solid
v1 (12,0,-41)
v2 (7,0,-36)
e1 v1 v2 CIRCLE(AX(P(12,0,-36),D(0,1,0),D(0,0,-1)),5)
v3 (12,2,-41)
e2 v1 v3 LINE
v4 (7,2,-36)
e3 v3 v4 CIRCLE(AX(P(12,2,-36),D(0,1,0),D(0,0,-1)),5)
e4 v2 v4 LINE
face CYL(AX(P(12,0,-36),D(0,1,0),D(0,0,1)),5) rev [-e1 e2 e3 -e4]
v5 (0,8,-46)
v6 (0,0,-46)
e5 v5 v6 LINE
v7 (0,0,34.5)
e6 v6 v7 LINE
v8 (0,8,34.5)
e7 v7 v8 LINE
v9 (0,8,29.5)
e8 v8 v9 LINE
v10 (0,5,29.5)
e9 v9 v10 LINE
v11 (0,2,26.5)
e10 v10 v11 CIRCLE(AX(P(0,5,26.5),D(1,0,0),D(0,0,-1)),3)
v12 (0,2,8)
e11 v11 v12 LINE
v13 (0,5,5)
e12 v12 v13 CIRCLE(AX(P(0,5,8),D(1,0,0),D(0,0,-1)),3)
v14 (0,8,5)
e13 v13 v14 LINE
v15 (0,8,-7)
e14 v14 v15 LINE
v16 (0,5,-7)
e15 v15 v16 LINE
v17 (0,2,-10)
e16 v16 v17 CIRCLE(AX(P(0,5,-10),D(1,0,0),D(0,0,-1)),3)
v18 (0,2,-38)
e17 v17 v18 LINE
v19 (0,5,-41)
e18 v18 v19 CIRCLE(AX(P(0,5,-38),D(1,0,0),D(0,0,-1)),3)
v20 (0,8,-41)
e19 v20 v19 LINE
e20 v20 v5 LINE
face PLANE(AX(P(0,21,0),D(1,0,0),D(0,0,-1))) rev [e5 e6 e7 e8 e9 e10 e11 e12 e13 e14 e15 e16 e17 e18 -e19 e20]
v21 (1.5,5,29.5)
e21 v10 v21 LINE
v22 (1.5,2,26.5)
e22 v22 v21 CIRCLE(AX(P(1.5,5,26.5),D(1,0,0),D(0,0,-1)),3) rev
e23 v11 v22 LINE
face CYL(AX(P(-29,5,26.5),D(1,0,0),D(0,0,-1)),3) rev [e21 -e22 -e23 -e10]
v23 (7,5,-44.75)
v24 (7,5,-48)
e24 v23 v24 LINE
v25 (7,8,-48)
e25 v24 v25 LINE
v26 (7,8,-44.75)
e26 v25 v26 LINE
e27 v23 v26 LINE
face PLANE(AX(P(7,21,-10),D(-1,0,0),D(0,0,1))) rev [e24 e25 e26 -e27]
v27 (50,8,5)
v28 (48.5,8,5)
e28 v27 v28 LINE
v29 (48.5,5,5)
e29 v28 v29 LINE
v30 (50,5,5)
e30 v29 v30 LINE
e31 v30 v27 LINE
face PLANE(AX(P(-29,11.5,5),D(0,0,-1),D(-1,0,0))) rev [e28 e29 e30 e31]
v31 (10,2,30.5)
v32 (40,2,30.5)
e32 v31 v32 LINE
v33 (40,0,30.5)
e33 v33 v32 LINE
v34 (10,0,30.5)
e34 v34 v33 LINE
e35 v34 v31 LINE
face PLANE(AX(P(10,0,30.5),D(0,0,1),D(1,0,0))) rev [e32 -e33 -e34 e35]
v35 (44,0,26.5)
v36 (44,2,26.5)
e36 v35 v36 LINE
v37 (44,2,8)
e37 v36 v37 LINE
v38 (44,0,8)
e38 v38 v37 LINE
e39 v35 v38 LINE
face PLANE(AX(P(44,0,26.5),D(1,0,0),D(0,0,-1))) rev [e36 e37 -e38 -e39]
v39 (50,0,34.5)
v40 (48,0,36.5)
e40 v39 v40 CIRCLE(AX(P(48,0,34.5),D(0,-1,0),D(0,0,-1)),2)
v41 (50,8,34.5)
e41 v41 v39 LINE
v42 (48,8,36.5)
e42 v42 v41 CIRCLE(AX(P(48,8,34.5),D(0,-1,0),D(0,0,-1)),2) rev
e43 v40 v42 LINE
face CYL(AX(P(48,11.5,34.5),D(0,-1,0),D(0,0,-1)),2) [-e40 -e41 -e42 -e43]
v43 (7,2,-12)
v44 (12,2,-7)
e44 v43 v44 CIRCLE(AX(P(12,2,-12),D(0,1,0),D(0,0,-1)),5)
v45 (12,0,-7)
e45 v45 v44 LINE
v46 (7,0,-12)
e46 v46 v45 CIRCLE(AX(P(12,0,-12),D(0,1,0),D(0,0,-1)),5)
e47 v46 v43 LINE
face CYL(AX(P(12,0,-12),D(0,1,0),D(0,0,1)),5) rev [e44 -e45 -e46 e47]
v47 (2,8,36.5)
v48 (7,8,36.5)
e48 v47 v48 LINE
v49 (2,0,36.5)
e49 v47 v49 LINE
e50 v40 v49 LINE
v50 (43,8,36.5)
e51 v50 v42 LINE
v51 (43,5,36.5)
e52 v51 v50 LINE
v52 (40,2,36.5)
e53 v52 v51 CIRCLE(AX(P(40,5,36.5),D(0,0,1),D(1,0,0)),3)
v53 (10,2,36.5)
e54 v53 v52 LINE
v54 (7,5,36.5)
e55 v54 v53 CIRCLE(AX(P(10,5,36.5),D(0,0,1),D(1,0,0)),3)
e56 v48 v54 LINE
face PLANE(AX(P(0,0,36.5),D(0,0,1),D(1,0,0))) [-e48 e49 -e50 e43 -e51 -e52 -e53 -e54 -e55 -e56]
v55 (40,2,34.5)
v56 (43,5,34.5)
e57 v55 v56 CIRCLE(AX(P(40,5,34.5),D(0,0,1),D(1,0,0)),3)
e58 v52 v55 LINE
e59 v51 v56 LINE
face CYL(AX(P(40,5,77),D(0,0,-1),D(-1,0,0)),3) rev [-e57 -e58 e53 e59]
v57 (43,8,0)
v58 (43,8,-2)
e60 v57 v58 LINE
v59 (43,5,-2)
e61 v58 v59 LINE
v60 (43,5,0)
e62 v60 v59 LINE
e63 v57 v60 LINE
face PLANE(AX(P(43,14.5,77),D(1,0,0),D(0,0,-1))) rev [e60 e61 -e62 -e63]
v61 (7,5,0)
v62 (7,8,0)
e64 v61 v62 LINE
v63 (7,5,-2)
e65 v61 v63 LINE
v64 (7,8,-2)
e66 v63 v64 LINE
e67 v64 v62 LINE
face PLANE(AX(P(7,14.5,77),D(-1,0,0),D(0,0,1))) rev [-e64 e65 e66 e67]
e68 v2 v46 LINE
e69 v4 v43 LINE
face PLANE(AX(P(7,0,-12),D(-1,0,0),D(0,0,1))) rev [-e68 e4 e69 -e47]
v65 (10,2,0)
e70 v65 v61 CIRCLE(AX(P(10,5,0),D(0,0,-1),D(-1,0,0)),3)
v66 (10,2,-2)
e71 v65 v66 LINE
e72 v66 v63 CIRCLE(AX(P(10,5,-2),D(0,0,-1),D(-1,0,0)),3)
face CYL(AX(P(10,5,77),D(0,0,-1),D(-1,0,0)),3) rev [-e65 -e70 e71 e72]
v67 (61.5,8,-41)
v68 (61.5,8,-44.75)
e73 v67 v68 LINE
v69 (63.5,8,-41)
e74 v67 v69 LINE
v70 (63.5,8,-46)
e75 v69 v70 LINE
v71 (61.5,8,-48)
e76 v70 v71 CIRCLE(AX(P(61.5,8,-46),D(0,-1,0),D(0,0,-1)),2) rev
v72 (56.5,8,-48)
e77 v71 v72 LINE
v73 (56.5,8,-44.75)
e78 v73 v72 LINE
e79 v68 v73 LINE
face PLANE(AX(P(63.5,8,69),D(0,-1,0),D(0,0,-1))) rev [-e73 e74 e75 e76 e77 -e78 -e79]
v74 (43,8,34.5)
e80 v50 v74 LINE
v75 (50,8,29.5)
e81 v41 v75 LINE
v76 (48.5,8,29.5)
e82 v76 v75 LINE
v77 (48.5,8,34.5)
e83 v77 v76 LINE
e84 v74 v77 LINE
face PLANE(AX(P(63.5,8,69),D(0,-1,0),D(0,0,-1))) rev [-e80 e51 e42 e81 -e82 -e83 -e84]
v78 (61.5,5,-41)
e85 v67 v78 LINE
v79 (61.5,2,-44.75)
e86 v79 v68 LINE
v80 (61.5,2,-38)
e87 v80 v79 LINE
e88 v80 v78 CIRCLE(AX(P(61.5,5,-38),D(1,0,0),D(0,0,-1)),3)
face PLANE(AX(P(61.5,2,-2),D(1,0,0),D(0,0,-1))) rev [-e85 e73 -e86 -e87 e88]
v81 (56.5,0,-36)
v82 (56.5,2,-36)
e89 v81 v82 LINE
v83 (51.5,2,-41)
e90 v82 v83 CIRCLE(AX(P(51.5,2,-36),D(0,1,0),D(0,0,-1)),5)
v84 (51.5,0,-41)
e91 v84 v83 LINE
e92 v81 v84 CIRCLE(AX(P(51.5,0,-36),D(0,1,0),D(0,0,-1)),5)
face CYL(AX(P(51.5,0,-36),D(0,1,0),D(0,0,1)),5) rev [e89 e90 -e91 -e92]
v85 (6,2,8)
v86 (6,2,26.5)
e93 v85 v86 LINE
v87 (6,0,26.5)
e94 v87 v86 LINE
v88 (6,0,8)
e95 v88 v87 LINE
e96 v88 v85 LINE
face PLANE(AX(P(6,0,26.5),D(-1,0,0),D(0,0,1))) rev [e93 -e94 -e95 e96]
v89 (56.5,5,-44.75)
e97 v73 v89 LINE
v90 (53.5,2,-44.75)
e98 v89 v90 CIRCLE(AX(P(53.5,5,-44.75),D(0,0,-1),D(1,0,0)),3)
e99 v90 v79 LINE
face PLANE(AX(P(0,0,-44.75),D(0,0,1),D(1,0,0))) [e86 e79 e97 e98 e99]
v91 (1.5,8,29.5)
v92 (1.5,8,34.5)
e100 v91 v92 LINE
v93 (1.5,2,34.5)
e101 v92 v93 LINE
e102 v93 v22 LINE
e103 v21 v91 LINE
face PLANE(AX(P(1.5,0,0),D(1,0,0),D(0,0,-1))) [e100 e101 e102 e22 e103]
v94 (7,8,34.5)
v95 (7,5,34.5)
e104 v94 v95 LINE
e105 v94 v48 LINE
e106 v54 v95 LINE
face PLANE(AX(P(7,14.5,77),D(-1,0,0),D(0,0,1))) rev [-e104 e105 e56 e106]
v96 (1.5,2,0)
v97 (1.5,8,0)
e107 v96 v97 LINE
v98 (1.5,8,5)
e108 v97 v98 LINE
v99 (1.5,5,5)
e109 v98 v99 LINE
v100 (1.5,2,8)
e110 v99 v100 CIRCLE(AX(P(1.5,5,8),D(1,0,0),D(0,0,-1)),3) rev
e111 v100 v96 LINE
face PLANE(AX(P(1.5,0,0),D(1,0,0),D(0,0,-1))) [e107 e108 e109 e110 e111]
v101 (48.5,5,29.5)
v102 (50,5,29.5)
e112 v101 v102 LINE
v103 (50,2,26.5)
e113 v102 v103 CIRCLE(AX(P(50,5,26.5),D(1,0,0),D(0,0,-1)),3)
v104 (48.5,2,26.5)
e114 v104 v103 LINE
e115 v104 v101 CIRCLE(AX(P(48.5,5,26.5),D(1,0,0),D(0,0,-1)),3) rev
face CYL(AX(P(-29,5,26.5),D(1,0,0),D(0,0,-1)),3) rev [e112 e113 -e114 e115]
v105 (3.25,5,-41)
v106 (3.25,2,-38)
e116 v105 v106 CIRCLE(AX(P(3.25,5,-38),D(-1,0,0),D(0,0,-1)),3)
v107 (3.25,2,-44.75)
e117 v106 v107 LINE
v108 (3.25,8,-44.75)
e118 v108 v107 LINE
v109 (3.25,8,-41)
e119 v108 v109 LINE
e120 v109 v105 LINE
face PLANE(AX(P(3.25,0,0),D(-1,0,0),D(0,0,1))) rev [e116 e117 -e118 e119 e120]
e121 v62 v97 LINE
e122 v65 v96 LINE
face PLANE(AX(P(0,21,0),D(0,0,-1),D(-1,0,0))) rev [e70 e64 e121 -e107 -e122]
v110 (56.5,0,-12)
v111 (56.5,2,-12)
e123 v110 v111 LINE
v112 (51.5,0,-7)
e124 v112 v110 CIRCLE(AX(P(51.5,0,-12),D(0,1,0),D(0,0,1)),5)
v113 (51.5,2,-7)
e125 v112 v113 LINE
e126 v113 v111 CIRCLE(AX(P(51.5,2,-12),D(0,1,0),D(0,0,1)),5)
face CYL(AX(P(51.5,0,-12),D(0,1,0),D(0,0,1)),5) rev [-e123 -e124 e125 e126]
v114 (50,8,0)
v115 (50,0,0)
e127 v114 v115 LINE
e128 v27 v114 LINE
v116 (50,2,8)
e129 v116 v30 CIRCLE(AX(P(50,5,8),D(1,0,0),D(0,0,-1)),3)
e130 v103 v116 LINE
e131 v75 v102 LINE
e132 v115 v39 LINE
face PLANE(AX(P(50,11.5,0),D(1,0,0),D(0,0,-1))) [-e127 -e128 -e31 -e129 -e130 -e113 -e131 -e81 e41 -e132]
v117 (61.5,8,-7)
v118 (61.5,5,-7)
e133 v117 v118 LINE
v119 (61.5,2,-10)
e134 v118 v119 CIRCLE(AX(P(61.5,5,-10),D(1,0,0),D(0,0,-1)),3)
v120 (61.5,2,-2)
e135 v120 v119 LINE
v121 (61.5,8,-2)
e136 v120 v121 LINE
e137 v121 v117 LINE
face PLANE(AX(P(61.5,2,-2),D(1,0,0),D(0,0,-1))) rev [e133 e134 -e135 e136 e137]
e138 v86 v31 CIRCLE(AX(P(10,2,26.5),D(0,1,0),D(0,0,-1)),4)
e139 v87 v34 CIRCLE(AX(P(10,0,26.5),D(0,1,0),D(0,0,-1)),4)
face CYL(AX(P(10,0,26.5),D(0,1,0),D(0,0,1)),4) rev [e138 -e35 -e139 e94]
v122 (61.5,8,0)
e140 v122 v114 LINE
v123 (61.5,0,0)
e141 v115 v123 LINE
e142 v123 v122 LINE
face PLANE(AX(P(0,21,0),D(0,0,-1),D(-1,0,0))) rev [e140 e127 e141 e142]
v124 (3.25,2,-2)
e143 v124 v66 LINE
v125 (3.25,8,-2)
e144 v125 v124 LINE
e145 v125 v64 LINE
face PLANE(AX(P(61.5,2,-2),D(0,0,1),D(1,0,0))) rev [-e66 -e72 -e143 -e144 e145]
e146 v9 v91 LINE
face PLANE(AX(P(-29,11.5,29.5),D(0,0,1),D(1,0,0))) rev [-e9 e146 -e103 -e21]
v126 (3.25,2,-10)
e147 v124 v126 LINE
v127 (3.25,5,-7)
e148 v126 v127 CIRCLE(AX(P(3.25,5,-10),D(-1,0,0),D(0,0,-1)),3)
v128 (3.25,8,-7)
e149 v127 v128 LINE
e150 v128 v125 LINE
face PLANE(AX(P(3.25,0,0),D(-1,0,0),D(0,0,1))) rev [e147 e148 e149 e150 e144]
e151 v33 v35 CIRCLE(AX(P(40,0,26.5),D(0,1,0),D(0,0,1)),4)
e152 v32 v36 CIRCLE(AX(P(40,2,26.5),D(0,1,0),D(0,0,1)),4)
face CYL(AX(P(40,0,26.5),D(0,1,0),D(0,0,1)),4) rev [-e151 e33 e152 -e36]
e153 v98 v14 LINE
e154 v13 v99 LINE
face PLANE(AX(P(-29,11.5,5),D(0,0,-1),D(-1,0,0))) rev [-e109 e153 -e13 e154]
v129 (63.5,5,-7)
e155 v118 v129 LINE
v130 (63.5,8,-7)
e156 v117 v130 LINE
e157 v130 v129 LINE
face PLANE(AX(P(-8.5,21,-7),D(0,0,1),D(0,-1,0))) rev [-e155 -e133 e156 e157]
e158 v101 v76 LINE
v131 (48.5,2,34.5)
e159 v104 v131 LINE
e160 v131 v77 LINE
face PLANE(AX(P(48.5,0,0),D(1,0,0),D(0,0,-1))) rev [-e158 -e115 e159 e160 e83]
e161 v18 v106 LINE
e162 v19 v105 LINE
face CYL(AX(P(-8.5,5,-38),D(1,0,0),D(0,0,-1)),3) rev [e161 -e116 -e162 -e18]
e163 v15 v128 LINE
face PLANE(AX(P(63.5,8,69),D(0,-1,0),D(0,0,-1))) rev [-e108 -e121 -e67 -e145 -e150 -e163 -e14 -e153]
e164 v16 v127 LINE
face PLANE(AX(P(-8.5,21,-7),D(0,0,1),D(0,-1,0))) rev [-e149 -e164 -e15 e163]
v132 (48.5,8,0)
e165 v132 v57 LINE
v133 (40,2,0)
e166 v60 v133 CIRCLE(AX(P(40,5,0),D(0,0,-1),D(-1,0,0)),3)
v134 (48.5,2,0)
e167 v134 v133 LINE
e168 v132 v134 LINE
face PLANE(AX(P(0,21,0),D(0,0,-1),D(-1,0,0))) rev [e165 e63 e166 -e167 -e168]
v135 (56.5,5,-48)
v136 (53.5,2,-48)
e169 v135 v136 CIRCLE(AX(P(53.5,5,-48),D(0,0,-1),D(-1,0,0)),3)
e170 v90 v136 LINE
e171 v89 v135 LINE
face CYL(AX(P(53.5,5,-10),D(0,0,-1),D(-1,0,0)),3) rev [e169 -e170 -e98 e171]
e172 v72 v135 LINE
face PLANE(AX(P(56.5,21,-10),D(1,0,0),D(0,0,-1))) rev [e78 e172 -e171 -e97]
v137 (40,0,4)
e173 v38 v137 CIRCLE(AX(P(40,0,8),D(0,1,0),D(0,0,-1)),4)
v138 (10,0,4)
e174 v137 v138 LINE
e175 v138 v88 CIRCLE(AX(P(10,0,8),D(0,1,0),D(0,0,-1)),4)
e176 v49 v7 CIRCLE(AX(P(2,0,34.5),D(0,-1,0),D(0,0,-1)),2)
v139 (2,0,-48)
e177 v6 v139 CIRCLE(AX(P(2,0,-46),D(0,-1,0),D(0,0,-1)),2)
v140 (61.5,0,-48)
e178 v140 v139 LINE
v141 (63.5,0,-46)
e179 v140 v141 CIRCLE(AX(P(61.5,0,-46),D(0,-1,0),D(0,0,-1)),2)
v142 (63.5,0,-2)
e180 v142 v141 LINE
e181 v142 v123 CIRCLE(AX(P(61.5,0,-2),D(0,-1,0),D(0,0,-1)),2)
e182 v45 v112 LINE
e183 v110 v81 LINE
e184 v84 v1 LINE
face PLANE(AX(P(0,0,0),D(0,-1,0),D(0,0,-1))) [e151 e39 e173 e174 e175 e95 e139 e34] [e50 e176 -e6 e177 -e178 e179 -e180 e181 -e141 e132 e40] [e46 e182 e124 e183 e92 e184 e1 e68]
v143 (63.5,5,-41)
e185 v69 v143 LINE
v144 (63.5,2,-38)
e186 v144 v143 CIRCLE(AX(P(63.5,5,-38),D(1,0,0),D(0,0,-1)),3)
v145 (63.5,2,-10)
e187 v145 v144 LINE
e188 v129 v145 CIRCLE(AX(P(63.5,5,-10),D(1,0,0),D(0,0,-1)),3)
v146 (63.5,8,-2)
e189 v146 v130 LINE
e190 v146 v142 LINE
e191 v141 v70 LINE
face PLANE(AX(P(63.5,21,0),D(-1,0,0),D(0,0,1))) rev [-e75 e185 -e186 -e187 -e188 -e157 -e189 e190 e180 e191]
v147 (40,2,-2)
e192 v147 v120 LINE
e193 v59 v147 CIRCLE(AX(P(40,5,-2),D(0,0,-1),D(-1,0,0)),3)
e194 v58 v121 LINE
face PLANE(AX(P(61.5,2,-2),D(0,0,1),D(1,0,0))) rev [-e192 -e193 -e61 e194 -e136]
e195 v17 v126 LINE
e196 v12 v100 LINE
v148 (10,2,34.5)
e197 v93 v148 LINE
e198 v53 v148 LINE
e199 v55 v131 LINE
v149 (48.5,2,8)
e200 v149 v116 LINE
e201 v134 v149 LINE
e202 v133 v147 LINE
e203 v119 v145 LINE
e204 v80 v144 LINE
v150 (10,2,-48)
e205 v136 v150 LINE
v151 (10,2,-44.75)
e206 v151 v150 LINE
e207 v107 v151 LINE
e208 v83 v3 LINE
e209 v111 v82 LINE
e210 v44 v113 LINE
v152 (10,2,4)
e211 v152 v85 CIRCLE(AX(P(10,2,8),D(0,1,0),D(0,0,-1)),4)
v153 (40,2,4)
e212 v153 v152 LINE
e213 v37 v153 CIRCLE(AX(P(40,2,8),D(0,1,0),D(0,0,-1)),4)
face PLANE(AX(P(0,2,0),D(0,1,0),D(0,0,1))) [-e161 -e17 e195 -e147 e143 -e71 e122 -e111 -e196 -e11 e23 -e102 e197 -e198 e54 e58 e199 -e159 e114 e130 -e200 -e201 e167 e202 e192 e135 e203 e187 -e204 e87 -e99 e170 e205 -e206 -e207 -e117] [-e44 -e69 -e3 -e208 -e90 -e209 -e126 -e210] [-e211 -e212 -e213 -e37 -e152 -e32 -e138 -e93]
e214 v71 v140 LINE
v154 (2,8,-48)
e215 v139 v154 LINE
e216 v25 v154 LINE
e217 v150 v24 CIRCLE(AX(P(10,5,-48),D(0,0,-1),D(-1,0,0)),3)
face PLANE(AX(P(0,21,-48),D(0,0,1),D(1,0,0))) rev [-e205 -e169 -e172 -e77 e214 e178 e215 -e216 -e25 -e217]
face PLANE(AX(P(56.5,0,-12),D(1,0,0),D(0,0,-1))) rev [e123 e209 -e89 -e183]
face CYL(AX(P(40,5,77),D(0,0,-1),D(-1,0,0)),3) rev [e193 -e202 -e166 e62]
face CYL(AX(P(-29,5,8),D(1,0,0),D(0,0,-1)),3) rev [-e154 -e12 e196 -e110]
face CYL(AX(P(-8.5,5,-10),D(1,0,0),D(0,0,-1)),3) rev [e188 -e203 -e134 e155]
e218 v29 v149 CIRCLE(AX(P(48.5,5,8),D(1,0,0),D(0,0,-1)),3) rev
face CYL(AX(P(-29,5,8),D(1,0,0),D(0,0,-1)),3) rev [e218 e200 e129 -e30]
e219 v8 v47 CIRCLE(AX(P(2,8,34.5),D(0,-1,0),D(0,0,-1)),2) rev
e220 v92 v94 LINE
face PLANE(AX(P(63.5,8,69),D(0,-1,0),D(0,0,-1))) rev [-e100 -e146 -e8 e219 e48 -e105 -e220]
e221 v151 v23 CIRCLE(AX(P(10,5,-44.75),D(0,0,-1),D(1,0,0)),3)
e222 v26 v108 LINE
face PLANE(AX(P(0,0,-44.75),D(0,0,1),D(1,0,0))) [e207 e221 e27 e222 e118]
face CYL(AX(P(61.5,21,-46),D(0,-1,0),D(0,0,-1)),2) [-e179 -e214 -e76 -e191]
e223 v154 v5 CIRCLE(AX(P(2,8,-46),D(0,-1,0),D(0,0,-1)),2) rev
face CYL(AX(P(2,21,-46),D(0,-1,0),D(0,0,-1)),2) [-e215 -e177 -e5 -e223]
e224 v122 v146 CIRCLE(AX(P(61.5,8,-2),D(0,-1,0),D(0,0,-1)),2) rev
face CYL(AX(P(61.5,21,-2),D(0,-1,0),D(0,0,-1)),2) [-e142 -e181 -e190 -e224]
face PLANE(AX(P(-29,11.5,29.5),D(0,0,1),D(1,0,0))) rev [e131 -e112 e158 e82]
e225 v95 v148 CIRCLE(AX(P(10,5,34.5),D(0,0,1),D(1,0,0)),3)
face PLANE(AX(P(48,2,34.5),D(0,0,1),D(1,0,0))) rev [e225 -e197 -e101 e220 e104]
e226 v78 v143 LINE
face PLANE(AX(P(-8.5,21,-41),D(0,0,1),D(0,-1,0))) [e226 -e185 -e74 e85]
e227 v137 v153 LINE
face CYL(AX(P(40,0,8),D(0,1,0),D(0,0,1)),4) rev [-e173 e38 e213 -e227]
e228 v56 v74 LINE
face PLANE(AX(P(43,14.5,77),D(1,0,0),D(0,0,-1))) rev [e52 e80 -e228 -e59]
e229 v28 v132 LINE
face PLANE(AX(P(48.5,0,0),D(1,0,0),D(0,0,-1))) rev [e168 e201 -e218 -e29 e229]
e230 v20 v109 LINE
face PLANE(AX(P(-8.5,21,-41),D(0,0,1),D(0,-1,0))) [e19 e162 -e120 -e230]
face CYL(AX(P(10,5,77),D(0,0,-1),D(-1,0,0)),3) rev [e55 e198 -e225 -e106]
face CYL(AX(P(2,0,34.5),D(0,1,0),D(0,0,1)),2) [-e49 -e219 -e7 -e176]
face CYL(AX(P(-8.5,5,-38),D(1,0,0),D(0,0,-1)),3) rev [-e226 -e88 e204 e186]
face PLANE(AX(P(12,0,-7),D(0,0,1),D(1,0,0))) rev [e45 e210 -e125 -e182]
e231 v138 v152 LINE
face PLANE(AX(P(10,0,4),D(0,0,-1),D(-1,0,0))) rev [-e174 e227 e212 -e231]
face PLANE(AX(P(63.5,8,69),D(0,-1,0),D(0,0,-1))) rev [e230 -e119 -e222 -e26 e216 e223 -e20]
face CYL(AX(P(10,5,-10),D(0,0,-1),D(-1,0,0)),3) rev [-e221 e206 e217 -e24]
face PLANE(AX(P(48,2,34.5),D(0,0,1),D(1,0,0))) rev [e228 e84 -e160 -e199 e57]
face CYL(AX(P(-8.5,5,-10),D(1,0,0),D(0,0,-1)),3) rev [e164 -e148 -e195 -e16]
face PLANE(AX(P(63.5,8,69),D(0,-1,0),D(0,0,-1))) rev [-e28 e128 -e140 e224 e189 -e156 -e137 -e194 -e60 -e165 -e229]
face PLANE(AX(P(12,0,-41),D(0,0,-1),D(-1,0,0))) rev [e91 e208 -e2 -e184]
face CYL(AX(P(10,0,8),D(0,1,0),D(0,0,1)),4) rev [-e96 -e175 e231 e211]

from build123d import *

# Parameters (mm, degrees)
SKETCH1_W            = 63.5
SKETCH1_H            = 48
BOSS_EXTRUDE6_DEPTH  = 21
SKETCH5_W            = 50
SKETCH5_H            = 38.5
BOSS_EXTRUDE7_DEPTH  = 11.5
SKETCH6_W            = 59.5
SKETCH6_H            = 44
CUT_EXTRUDE1_DEPTH   = 19
SKETCH7_W            = 46
SKETCH7_H            = 34.5
CUT_EXTRUDE2_DEPTH   = 9.5
SKETCH8_W            = 50
SKETCH8_H            = 11.5
CUT_EXTRUDE4_DEPTH   = 2
CUT_EXTRUDE6_DEPTH   = 2
CUT_EXTRUDE7_DEPTH   = 2
CUT_EXTRUDE10_DEPTH  = 72
CUT_EXTRUDE11_DEPTH  = 38
SKETCH16_W           = 67
SKETCH16_H           = 6.5
CUT_EXTRUDE13_DEPTH  = 79
CUT_EXTRUDE14_DEPTH  = 79
CUT_EXTRUDE15_DEPTH  = 79
FILLET1_R            = 2
FILLET2_R            = 2
FILLET3_R            = 2
FILLET4_R            = 2
FILLET5_R            = 2
SKETCH19_W           = 36.5
SKETCH19_H           = 2
CUT_EXTRUDE17_DEPTH  = 79
FILLET6_R            = 5
FILLET7_R            = 5
SKETCH20_W           = 4
SKETCH20_H           = 2
BOSS_EXTRUDE16_DEPTH = 18
SKETCH30_W           = 4
SKETCH30_H           = 1
BOSS_EXTRUDE17_DEPTH = 2
SKETCH33_W           = 4
SKETCH33_H           = 1.5
BOSS_EXTRUDE18_DEPTH = 4
SKETCH34_W           = 4
SKETCH34_H           = 1
BOSS_EXTRUDE19_DEPTH = 2
SKETCH36_W           = 4
SKETCH36_H           = 1
CUT_EXTRUDE21_DEPTH  = 2
CUT_EXTRUDE22_DEPTH  = 7
CUT_EXTRUDE25_DEPTH  = 7
SKETCH39_W           = 9.212342007
SKETCH39_H           = 18
CUT_EXTRUDE26_DEPTH  = 10
SKETCH40_W           = 63.5
SKETCH40_H           = 6.5
CUT_EXTRUDE27_DEPTH  = 117
SKETCH44_W           = 34.5
SKETCH44_H           = 6
CUT_EXTRUDE30_DEPTH  = 0.5
SKETCH45_W           = 34.5
SKETCH45_H           = 6
CUT_EXTRUDE31_DEPTH  = 0.5
SKETCH46_W           = 44
SKETCH46_H           = 6
BOSS_EXTRUDE20_DEPTH = 1.25
SKETCH47_W           = 58.25
SKETCH47_H           = 6
BOSS_EXTRUDE21_DEPTH = 1.25
CUT_EXTRUDE32_START  = -1.25
CUT_EXTRUDE32_DEPTH  = 1.25
CUT_EXTRUDE33_DEPTH  = 1.25


with BuildPart() as part:
    # Sketch1 → Boss-Extrude6 (new body)
    with BuildSketch(Plane(origin=(0, 0, 0), x_dir=(1, 0, 0), z_dir=(0, 1, 0))):
        with Locations((31.75, 24)):
            Rectangle(SKETCH1_W, SKETCH1_H)
    extrude(amount=BOSS_EXTRUDE6_DEPTH)

    # Sketch5 → Boss-Extrude7 (add)
    with BuildSketch(Plane(origin=(0, 0, 0), x_dir=(-1, 0, 0), z_dir=(0, -1, 0))):
        with Locations((-25, -19.25)):
            Rectangle(SKETCH5_W, SKETCH5_H)
    extrude(amount=-BOSS_EXTRUDE7_DEPTH)

    # Sketch6 → Cut-Extrude1 (cut)
    with BuildSketch(Plane(origin=(0, 21, 0), x_dir=(1, 0, 0), z_dir=(0, 1, 0))):
        with Locations((31.75, 24)):
            Rectangle(SKETCH6_W, SKETCH6_H)
    extrude(amount=-CUT_EXTRUDE1_DEPTH, mode=Mode.SUBTRACT)

    # Sketch7 → Cut-Extrude2 (cut)
    with BuildSketch(Plane(origin=(0, 11.5, 0), x_dir=(1, 0, 0), z_dir=(0, 1, 0))):
        with Locations((25, -17.25)):
            Rectangle(SKETCH7_W, SKETCH7_H)
    extrude(amount=-CUT_EXTRUDE2_DEPTH, mode=Mode.SUBTRACT)

    # Sketch8 → Cut-Extrude4 (cut)
    with BuildSketch(Plane.XY.offset(38.5)):
        with Locations((25, 5.75)):
            Rectangle(SKETCH8_W, SKETCH8_H)
    extrude(amount=-CUT_EXTRUDE4_DEPTH, mode=Mode.SUBTRACT)

    # Sketch10 → Cut-Extrude6 (cut)
    with BuildSketch(Plane(origin=(0, 2, 0), x_dir=(1, 0, 0), z_dir=(0, 1, 0))):
        with BuildLine():
            Line((12, 7), (51.5, 7))
            ThreePointArc((51.5, 7), (55.035533906, 8.464466094), (56.5, 12))
            Line((56.5, 12), (56.5, 36))
            ThreePointArc((56.5, 36), (55.035533906, 39.535533906), (51.5, 41))
            Line((51.5, 41), (12, 41))
            ThreePointArc((12, 41), (8.464466094, 39.535533906), (7, 36))
            Line((7, 36), (7, 12))
            ThreePointArc((7, 12), (8.464466094, 8.464466094), (12, 7))
        make_face()
    extrude(amount=-CUT_EXTRUDE6_DEPTH, mode=Mode.SUBTRACT)

    # Sketch11 → Cut-Extrude7 (cut)
    with BuildSketch(Plane(origin=(0, 2, 0), x_dir=(1, 0, 0), z_dir=(0, 1, 0))):
        with BuildLine():
            Line((10, -30.5), (40, -30.5))
            ThreePointArc((40, -30.5), (42.828427125, -29.328427125), (44, -26.5))
            Line((44, -26.5), (44, -8))
            ThreePointArc((44, -8), (42.828427125, -5.171572875), (40, -4))
            Line((40, -4), (10, -4))
            ThreePointArc((10, -4), (7.171572875, -5.171572875), (6, -8))
            Line((6, -8), (6, -26.5))
            ThreePointArc((6, -26.5), (7.171572875, -29.328427125), (10, -30.5))
        make_face()
    extrude(amount=-CUT_EXTRUDE7_DEPTH, mode=Mode.SUBTRACT)

    # Sketch13 → Cut-Extrude10 (cut)
    with BuildSketch(Plane(origin=(63.5, 0, 0), x_dir=(0, 0, -1), z_dir=(1, 0, 0))):
        with BuildLine():
            Line((7, 21), (41, 21))
            Line((41, 21), (41, 5))
            ThreePointArc((41, 5), (40.121320344, 2.878679656), (38, 2))
            Line((38, 2), (10, 2))
            ThreePointArc((10, 2), (7.878679656, 2.878679656), (7, 5))
            Line((7, 5), (7, 21))
        make_face()
    extrude(amount=-CUT_EXTRUDE10_DEPTH, mode=Mode.SUBTRACT)

    # Sketch14 → Cut-Extrude11 (cut)
    with BuildSketch(Plane(origin=(0, 0, -48), x_dir=(-1, 0, 0), z_dir=(0, 0, -1))):
        with BuildLine():
            Line((-56.5, 21), (-7, 21))
            Line((-7, 21), (-7, 5))
            ThreePointArc((-7, 5), (-7.878679656, 2.878679656), (-10, 2))
            Line((-10, 2), (-53.5, 2))
            ThreePointArc((-53.5, 2), (-55.621320344, 2.878679656), (-56.5, 5))
            Line((-56.5, 5), (-56.5, 21))
        make_face()
    extrude(amount=-CUT_EXTRUDE11_DEPTH, mode=Mode.SUBTRACT)

    # Sketch16 → Cut-Extrude13 (cut)
    with BuildSketch(Plane(origin=(63.5, 0, 0), x_dir=(0, 0, -1), z_dir=(1, 0, 0))):
        with Locations((14.5, 17.75)):
            Rectangle(SKETCH16_W, SKETCH16_H)
    extrude(amount=-CUT_EXTRUDE13_DEPTH, mode=Mode.SUBTRACT)

    # Sketch17 → Cut-Extrude14 (cut)
    with BuildSketch(Plane(origin=(0, 0, -2), x_dir=(-1, 0, 0), z_dir=(0, 0, -1))):
        with BuildLine():
            Line((-43, 14.5), (-7, 14.5))
            Line((-7, 14.5), (-7, 5))
            ThreePointArc((-7, 5), (-7.878679656, 2.878679656), (-10, 2))
            Line((-10, 2), (-40, 2))
            ThreePointArc((-40, 2), (-42.121320344, 2.878679656), (-43, 5))
            Line((-43, 5), (-43, 14.5))
        make_face()
    extrude(amount=-CUT_EXTRUDE14_DEPTH, mode=Mode.SUBTRACT)

    # Sketch18 → Cut-Extrude15 (cut)
    with BuildSketch(Plane(origin=(50, 0, 0), x_dir=(0, 0, -1), z_dir=(1, 0, 0))):
        with BuildLine():
            Line((-29.5, 11.5), (-5, 11.5))
            Line((-5, 11.5), (-5, 5))
            ThreePointArc((-5, 5), (-5.878679656, 2.878679656), (-8, 2))
            Line((-8, 2), (-26.5, 2))
            ThreePointArc((-26.5, 2), (-28.621320344, 2.878679656), (-29.5, 5))
            Line((-29.5, 5), (-29.5, 11.5))
        make_face()
    extrude(amount=-CUT_EXTRUDE15_DEPTH, mode=Mode.SUBTRACT)

    # Fillet1
    fillet1_edges = [part.edges().sort_by_distance(p)[0] for p in [
        (50, 5.75, 36.5),
    ]]
    fillet(fillet1_edges, radius=FILLET1_R)

    # Fillet2
    fillet2_edges = [part.edges().sort_by_distance(p)[0] for p in [
        (0, 5.75, 36.5),
    ]]
    fillet(fillet2_edges, radius=FILLET2_R)

    # Fillet3
    fillet3_edges = [part.edges().sort_by_distance(p)[0] for p in [
        (0, 7.25, -48),
    ]]
    fillet(fillet3_edges, radius=FILLET3_R)

    # Fillet4
    fillet4_edges = [part.edges().sort_by_distance(p)[0] for p in [
        (63.5, 7.25, -48),
    ]]
    fillet(fillet4_edges, radius=FILLET4_R)

    # Fillet5
    fillet5_edges = [part.edges().sort_by_distance(p)[0] for p in [
        (63.5, 7.25, 0),
    ]]
    fillet(fillet5_edges, radius=FILLET5_R)

    # Sketch19 → Cut-Extrude17 (cut)
    with BuildSketch(Plane(origin=(50, 0, 0), x_dir=(0, 0, -1), z_dir=(1, 0, 0))):
        with Locations((-18.25, 10.5)):
            Rectangle(SKETCH19_W, SKETCH19_H)
    extrude(amount=-CUT_EXTRUDE17_DEPTH, mode=Mode.SUBTRACT)

    # Fillet6
    fillet6_edges = [part.edges().sort_by_distance(p)[0] for p in [
        (1, 9.5, 0),
    ]]
    fillet(fillet6_edges, radius=FILLET6_R - 0.0001)  # a hair under: the kernel refuses the full size

    # Fillet7
    fillet7_edges = [part.edges().sort_by_distance(p)[0] for p in [
        (49, 9.5, 0),
    ]]
    fillet(fillet7_edges, radius=FILLET7_R - 0.0001)  # a hair under: the kernel refuses the full size

    # Sketch20 → Boss-Extrude16 (add)
    with BuildSketch(Plane(origin=(0, 2, 0), x_dir=(1, 0, 0), z_dir=(0, 1, 0))):
        with Locations((25, 1)):
            Rectangle(SKETCH20_W, SKETCH20_H)
    extrude(amount=BOSS_EXTRUDE16_DEPTH)

    # Sketch30 → Boss-Extrude17 (add)
    with BuildSketch(Plane.XY):
        with Locations((25, 19.5)):
            Rectangle(SKETCH30_W, SKETCH30_H)
    extrude(amount=BOSS_EXTRUDE17_DEPTH)

    # Sketch33 → Boss-Extrude18 (add)
    with BuildSketch(Plane.XY):
        with Locations((25, 12.75)):
            Rectangle(SKETCH33_W, SKETCH33_H)
    extrude(amount=BOSS_EXTRUDE18_DEPTH)

    # Sketch34 → Boss-Extrude19 (add)
    with BuildSketch(Plane(origin=(0, 0, -2), x_dir=(-1, 0, 0), z_dir=(0, 0, -1))):
        with Locations((-25, 19.5)):
            Rectangle(SKETCH34_W, SKETCH34_H)
    extrude(amount=BOSS_EXTRUDE19_DEPTH)

    # Sketch36 → Cut-Extrude21 (cut)
    with BuildSketch(Plane.XY.offset(2)):
        with Locations((25, 19.5)):
            Rectangle(SKETCH36_W, SKETCH36_H)
    extrude(amount=-CUT_EXTRUDE21_DEPTH, mode=Mode.SUBTRACT)

    # Sketch37 → Cut-Extrude22 (cut)
    with BuildSketch(Plane(origin=(27, 0, 0), x_dir=(0, 0, -1), z_dir=(1, 0, 0))):
        Polygon((0, 20), (4, 19.257089557), (4, 20), align=None)
    extrude(amount=-CUT_EXTRUDE22_DEPTH, mode=Mode.SUBTRACT)

    # Sketch38 → Cut-Extrude25 (cut)
    with BuildSketch(Plane(origin=(27, 0, 0), x_dir=(0, 0, -1), z_dir=(1, 0, 0))):
        Polygon((0, 13.5), (-4, 10.225610037), (-4, 13.5), align=None)
    extrude(amount=-CUT_EXTRUDE25_DEPTH, mode=Mode.SUBTRACT)

    # Sketch39 → Cut-Extrude26 (cut)
    with BuildSketch(Plane(origin=(27, 0, 0), x_dir=(0, 0, -1), z_dir=(1, 0, 0))):
        with Locations((2.773768612, 11)):
            Rectangle(SKETCH39_W, SKETCH39_H)
    extrude(amount=-CUT_EXTRUDE26_DEPTH, mode=Mode.SUBTRACT)

    # Sketch40 → Cut-Extrude27 (cut)
    with BuildSketch(Plane(origin=(0, 0, -48), x_dir=(-1, 0, 0), z_dir=(0, 0, -1))):
        with Locations((-31.75, 11.25)):
            Rectangle(SKETCH40_W, SKETCH40_H)
    extrude(amount=-CUT_EXTRUDE27_DEPTH, mode=Mode.SUBTRACT)

    # Sketch44 → Cut-Extrude30 (cut)
    with BuildSketch(Plane(origin=(2, 0, 0), x_dir=(0, 0, -1), z_dir=(1, 0, 0))):
        with Locations((-17.25, 5)):
            Rectangle(SKETCH44_W, SKETCH44_H)
    extrude(amount=-CUT_EXTRUDE30_DEPTH, mode=Mode.SUBTRACT)

    # Sketch45 → Cut-Extrude31 (cut)
    with BuildSketch(Plane.ZY.offset(-48)):
        with Locations((17.25, 5)):
            Rectangle(SKETCH45_W, SKETCH45_H)
    extrude(amount=-CUT_EXTRUDE31_DEPTH, mode=Mode.SUBTRACT)

    # Sketch46 → Boss-Extrude20 (add)
    with BuildSketch(Plane(origin=(2, 0, 0), x_dir=(0, 0, -1), z_dir=(1, 0, 0))):
        with Locations((24, 5)):
            Rectangle(SKETCH46_W, SKETCH46_H)
    extrude(amount=BOSS_EXTRUDE20_DEPTH)

    # Sketch47 → Boss-Extrude21 (add)
    with BuildSketch(Plane.XY.offset(-46)):
        with Locations((32.375, 5)):
            Rectangle(SKETCH47_W, SKETCH47_H)
    extrude(amount=BOSS_EXTRUDE21_DEPTH)

    # Sketch48 → Cut-Extrude32 (cut)
    with BuildSketch(Plane.ZY.offset(-2).offset(CUT_EXTRUDE32_START)):
        with BuildLine():
            Line((-7, 8), (-41, 8))
            Line((-41, 8), (-41, 5))
            ThreePointArc((-41, 5), (-40.121320344, 2.878679656), (-38, 2))
            Line((-38, 2), (-10, 2))
            ThreePointArc((-10, 2), (-7.878679656, 2.878679656), (-7, 5))
            Line((-7, 5), (-7, 8))
        make_face()
    extrude(amount=CUT_EXTRUDE32_DEPTH, mode=Mode.SUBTRACT)

    # Sketch49 → Cut-Extrude33 (cut)
    with BuildSketch(Plane(origin=(0, 0, -46), x_dir=(-1, 0, 0), z_dir=(0, 0, -1))):
        with BuildLine():
            Line((-7, 8), (-56.5, 8))
            Line((-56.5, 8), (-56.5, 5))
            ThreePointArc((-56.5, 5), (-55.621320344, 2.878679656), (-53.5, 2))
            Line((-53.5, 2), (-10, 2))
            ThreePointArc((-10, 2), (-7.878679656, 2.878679656), (-7, 5))
            Line((-7, 5), (-7, 8))
        make_face()
    extrude(amount=-CUT_EXTRUDE33_DEPTH, mode=Mode.SUBTRACT)


solid = part.part
